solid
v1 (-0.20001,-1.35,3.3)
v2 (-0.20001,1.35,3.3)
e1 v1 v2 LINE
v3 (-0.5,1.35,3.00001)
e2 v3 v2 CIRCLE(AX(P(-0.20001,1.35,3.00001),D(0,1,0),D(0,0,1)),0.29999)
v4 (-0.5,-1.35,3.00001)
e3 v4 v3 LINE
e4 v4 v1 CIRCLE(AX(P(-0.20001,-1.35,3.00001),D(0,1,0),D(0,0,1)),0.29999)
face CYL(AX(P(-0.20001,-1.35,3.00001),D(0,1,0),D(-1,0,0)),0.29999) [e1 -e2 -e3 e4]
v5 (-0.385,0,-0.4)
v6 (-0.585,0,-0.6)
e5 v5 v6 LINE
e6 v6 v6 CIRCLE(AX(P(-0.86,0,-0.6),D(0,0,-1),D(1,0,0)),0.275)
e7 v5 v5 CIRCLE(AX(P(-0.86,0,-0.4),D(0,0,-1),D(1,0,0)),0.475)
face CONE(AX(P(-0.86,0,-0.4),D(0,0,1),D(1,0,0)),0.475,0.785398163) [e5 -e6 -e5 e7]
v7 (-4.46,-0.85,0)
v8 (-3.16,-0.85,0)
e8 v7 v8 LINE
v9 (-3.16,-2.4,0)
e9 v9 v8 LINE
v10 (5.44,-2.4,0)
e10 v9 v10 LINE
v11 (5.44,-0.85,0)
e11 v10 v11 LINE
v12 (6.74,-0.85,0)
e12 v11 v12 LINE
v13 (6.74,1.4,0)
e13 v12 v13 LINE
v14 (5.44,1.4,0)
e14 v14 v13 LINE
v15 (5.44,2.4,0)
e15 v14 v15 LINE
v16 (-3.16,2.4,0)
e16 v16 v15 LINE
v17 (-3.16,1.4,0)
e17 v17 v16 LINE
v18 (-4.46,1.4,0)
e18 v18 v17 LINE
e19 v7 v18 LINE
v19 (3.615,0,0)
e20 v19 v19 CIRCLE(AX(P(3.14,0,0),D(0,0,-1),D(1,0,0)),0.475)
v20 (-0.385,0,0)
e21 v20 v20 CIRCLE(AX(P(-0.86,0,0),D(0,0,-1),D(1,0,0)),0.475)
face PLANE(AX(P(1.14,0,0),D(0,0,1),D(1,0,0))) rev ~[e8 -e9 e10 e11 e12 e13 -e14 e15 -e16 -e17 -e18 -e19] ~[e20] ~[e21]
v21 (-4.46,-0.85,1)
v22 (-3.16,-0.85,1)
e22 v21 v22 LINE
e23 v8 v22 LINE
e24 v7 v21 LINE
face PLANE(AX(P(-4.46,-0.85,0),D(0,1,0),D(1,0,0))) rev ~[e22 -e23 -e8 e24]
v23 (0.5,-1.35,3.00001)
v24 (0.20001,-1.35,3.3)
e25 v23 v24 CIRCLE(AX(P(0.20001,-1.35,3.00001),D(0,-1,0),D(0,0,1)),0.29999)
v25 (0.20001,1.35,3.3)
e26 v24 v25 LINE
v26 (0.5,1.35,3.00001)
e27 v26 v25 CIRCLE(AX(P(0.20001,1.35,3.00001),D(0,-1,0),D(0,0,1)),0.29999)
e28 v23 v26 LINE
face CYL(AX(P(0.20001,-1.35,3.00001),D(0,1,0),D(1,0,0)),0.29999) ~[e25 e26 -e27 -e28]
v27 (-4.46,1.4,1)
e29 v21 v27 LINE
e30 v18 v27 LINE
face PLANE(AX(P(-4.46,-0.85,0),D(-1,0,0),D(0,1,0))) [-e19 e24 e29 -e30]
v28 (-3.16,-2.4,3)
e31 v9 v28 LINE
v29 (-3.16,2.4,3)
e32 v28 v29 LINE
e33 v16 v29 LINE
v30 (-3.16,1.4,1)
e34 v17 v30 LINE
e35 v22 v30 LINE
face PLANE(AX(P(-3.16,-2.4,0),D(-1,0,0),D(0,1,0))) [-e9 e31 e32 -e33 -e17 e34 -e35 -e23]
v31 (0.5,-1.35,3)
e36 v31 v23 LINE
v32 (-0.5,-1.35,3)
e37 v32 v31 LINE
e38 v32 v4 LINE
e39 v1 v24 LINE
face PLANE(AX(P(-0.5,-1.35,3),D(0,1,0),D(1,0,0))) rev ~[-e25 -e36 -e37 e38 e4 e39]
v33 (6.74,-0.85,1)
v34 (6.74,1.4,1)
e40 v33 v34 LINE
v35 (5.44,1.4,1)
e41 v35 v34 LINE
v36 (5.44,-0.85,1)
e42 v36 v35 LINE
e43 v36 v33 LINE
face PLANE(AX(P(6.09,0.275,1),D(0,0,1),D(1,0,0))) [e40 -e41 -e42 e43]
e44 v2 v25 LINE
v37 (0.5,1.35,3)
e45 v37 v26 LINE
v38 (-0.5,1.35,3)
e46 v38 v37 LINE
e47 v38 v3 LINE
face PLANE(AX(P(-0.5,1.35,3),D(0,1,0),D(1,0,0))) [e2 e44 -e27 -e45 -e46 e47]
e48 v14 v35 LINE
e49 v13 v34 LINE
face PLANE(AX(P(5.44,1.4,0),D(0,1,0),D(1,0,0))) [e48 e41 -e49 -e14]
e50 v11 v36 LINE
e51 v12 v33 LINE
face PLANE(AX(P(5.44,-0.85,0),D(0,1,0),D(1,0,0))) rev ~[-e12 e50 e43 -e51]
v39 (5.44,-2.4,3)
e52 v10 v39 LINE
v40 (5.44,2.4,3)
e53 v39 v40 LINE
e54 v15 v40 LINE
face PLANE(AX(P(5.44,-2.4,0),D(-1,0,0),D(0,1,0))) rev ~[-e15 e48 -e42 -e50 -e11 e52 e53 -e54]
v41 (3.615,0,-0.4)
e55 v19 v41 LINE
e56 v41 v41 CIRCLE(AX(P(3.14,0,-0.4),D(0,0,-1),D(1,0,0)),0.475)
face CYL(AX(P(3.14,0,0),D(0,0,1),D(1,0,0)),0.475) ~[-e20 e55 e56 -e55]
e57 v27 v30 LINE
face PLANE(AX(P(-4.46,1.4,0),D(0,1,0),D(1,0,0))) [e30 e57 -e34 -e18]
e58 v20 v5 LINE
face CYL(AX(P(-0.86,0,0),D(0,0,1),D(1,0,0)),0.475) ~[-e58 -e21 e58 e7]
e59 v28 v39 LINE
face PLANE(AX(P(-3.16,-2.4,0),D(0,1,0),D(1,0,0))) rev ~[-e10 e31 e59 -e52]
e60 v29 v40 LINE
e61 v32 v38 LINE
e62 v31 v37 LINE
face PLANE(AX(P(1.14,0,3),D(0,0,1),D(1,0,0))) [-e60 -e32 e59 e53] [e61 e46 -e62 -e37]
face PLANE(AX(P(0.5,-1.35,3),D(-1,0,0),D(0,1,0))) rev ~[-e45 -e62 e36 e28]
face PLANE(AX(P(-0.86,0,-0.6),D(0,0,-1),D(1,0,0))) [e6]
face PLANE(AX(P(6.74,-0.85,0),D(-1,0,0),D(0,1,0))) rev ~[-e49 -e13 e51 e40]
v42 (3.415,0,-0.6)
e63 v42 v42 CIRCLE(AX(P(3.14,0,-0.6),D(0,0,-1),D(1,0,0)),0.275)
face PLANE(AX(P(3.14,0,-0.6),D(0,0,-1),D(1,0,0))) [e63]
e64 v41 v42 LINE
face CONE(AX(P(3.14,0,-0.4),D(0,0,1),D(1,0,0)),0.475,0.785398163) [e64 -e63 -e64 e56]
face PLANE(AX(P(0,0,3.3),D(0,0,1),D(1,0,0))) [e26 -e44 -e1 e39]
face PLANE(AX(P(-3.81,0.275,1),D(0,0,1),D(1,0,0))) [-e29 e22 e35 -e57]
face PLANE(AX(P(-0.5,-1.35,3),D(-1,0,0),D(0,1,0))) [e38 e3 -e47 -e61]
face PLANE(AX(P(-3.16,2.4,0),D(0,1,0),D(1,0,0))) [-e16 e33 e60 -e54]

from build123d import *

# Parameters (mm, degrees)
F0_W     = 8.6
F0_H     = 4.8
F1_DEPTH = 3
F2_R     = 0.475
F3_DEPTH = 0.6
F4_SIZE  = 0.2
F5_W     = 1.3
F5_H     = 2.25
F6_DEPTH = 1
F7_W     = 1
F7_H     = 2.7
F8_DEPTH = 0.3
F9_R     = 0.29999


# Not quite as in the source:
# - a fillet or chamfer is up to 0.001 mm smaller than in the source, because OpenCascade refuses the exact size


with BuildPart() as f1:
    # F0 (on Top) → F1 (new body)
    with BuildSketch(Plane.XY):
        Rectangle(F0_W, F0_H)
    extrude(amount=F1_DEPTH)

    # F2 (on face) → F3 (join)
    with BuildSketch(Plane(origin=(0, 0, 0), x_dir=(1, 0, 0), z_dir=(0, 0, -1))):
        with Locations((-2, 0)):
            Circle(F2_R)
        with Locations((2, 0)):
            Circle(F2_R)
    extrude(amount=F3_DEPTH)

    # F4
    f4_edges = [f1.edges().sort_by_distance(p)[0] for p in [
        (-2.475, 0, -0.6),
        (1.525, 0, -0.6),
    ]]
    chamfer(f4_edges, length=F4_SIZE)

    # F5 (on Top) → F6 (join)
    with BuildSketch(Plane.XY):
        with Locations((-4.95, 0.275)):
            Rectangle(F5_W, F5_H)
        with Locations((4.95, 0.275)):
            Rectangle(F5_W, F5_H)
    extrude(amount=F6_DEPTH)

    # F7 (on face) → F8 (join)
    with BuildSketch(Plane.XY.offset(3)):
        with Locations((-1.14, 0)):
            Rectangle(F7_W, F7_H)
    extrude(amount=F8_DEPTH)

    # F9 (radius 0.3 in the source; OpenCascade refuses exactly that, so slightly less here)
    f9_edges = [f1.edges().sort_by_distance(p)[0] for p in [
        (-1.64, 0, 3.3),
        (-0.64, 0, 3.3),
    ]]
    fillet(f9_edges, radius=F9_R)


with BuildPart() as f1_1:
    # F10: moved
    add(f1.part.moved(Location((1.14, 0, 0))))


solid = f1_1.part
